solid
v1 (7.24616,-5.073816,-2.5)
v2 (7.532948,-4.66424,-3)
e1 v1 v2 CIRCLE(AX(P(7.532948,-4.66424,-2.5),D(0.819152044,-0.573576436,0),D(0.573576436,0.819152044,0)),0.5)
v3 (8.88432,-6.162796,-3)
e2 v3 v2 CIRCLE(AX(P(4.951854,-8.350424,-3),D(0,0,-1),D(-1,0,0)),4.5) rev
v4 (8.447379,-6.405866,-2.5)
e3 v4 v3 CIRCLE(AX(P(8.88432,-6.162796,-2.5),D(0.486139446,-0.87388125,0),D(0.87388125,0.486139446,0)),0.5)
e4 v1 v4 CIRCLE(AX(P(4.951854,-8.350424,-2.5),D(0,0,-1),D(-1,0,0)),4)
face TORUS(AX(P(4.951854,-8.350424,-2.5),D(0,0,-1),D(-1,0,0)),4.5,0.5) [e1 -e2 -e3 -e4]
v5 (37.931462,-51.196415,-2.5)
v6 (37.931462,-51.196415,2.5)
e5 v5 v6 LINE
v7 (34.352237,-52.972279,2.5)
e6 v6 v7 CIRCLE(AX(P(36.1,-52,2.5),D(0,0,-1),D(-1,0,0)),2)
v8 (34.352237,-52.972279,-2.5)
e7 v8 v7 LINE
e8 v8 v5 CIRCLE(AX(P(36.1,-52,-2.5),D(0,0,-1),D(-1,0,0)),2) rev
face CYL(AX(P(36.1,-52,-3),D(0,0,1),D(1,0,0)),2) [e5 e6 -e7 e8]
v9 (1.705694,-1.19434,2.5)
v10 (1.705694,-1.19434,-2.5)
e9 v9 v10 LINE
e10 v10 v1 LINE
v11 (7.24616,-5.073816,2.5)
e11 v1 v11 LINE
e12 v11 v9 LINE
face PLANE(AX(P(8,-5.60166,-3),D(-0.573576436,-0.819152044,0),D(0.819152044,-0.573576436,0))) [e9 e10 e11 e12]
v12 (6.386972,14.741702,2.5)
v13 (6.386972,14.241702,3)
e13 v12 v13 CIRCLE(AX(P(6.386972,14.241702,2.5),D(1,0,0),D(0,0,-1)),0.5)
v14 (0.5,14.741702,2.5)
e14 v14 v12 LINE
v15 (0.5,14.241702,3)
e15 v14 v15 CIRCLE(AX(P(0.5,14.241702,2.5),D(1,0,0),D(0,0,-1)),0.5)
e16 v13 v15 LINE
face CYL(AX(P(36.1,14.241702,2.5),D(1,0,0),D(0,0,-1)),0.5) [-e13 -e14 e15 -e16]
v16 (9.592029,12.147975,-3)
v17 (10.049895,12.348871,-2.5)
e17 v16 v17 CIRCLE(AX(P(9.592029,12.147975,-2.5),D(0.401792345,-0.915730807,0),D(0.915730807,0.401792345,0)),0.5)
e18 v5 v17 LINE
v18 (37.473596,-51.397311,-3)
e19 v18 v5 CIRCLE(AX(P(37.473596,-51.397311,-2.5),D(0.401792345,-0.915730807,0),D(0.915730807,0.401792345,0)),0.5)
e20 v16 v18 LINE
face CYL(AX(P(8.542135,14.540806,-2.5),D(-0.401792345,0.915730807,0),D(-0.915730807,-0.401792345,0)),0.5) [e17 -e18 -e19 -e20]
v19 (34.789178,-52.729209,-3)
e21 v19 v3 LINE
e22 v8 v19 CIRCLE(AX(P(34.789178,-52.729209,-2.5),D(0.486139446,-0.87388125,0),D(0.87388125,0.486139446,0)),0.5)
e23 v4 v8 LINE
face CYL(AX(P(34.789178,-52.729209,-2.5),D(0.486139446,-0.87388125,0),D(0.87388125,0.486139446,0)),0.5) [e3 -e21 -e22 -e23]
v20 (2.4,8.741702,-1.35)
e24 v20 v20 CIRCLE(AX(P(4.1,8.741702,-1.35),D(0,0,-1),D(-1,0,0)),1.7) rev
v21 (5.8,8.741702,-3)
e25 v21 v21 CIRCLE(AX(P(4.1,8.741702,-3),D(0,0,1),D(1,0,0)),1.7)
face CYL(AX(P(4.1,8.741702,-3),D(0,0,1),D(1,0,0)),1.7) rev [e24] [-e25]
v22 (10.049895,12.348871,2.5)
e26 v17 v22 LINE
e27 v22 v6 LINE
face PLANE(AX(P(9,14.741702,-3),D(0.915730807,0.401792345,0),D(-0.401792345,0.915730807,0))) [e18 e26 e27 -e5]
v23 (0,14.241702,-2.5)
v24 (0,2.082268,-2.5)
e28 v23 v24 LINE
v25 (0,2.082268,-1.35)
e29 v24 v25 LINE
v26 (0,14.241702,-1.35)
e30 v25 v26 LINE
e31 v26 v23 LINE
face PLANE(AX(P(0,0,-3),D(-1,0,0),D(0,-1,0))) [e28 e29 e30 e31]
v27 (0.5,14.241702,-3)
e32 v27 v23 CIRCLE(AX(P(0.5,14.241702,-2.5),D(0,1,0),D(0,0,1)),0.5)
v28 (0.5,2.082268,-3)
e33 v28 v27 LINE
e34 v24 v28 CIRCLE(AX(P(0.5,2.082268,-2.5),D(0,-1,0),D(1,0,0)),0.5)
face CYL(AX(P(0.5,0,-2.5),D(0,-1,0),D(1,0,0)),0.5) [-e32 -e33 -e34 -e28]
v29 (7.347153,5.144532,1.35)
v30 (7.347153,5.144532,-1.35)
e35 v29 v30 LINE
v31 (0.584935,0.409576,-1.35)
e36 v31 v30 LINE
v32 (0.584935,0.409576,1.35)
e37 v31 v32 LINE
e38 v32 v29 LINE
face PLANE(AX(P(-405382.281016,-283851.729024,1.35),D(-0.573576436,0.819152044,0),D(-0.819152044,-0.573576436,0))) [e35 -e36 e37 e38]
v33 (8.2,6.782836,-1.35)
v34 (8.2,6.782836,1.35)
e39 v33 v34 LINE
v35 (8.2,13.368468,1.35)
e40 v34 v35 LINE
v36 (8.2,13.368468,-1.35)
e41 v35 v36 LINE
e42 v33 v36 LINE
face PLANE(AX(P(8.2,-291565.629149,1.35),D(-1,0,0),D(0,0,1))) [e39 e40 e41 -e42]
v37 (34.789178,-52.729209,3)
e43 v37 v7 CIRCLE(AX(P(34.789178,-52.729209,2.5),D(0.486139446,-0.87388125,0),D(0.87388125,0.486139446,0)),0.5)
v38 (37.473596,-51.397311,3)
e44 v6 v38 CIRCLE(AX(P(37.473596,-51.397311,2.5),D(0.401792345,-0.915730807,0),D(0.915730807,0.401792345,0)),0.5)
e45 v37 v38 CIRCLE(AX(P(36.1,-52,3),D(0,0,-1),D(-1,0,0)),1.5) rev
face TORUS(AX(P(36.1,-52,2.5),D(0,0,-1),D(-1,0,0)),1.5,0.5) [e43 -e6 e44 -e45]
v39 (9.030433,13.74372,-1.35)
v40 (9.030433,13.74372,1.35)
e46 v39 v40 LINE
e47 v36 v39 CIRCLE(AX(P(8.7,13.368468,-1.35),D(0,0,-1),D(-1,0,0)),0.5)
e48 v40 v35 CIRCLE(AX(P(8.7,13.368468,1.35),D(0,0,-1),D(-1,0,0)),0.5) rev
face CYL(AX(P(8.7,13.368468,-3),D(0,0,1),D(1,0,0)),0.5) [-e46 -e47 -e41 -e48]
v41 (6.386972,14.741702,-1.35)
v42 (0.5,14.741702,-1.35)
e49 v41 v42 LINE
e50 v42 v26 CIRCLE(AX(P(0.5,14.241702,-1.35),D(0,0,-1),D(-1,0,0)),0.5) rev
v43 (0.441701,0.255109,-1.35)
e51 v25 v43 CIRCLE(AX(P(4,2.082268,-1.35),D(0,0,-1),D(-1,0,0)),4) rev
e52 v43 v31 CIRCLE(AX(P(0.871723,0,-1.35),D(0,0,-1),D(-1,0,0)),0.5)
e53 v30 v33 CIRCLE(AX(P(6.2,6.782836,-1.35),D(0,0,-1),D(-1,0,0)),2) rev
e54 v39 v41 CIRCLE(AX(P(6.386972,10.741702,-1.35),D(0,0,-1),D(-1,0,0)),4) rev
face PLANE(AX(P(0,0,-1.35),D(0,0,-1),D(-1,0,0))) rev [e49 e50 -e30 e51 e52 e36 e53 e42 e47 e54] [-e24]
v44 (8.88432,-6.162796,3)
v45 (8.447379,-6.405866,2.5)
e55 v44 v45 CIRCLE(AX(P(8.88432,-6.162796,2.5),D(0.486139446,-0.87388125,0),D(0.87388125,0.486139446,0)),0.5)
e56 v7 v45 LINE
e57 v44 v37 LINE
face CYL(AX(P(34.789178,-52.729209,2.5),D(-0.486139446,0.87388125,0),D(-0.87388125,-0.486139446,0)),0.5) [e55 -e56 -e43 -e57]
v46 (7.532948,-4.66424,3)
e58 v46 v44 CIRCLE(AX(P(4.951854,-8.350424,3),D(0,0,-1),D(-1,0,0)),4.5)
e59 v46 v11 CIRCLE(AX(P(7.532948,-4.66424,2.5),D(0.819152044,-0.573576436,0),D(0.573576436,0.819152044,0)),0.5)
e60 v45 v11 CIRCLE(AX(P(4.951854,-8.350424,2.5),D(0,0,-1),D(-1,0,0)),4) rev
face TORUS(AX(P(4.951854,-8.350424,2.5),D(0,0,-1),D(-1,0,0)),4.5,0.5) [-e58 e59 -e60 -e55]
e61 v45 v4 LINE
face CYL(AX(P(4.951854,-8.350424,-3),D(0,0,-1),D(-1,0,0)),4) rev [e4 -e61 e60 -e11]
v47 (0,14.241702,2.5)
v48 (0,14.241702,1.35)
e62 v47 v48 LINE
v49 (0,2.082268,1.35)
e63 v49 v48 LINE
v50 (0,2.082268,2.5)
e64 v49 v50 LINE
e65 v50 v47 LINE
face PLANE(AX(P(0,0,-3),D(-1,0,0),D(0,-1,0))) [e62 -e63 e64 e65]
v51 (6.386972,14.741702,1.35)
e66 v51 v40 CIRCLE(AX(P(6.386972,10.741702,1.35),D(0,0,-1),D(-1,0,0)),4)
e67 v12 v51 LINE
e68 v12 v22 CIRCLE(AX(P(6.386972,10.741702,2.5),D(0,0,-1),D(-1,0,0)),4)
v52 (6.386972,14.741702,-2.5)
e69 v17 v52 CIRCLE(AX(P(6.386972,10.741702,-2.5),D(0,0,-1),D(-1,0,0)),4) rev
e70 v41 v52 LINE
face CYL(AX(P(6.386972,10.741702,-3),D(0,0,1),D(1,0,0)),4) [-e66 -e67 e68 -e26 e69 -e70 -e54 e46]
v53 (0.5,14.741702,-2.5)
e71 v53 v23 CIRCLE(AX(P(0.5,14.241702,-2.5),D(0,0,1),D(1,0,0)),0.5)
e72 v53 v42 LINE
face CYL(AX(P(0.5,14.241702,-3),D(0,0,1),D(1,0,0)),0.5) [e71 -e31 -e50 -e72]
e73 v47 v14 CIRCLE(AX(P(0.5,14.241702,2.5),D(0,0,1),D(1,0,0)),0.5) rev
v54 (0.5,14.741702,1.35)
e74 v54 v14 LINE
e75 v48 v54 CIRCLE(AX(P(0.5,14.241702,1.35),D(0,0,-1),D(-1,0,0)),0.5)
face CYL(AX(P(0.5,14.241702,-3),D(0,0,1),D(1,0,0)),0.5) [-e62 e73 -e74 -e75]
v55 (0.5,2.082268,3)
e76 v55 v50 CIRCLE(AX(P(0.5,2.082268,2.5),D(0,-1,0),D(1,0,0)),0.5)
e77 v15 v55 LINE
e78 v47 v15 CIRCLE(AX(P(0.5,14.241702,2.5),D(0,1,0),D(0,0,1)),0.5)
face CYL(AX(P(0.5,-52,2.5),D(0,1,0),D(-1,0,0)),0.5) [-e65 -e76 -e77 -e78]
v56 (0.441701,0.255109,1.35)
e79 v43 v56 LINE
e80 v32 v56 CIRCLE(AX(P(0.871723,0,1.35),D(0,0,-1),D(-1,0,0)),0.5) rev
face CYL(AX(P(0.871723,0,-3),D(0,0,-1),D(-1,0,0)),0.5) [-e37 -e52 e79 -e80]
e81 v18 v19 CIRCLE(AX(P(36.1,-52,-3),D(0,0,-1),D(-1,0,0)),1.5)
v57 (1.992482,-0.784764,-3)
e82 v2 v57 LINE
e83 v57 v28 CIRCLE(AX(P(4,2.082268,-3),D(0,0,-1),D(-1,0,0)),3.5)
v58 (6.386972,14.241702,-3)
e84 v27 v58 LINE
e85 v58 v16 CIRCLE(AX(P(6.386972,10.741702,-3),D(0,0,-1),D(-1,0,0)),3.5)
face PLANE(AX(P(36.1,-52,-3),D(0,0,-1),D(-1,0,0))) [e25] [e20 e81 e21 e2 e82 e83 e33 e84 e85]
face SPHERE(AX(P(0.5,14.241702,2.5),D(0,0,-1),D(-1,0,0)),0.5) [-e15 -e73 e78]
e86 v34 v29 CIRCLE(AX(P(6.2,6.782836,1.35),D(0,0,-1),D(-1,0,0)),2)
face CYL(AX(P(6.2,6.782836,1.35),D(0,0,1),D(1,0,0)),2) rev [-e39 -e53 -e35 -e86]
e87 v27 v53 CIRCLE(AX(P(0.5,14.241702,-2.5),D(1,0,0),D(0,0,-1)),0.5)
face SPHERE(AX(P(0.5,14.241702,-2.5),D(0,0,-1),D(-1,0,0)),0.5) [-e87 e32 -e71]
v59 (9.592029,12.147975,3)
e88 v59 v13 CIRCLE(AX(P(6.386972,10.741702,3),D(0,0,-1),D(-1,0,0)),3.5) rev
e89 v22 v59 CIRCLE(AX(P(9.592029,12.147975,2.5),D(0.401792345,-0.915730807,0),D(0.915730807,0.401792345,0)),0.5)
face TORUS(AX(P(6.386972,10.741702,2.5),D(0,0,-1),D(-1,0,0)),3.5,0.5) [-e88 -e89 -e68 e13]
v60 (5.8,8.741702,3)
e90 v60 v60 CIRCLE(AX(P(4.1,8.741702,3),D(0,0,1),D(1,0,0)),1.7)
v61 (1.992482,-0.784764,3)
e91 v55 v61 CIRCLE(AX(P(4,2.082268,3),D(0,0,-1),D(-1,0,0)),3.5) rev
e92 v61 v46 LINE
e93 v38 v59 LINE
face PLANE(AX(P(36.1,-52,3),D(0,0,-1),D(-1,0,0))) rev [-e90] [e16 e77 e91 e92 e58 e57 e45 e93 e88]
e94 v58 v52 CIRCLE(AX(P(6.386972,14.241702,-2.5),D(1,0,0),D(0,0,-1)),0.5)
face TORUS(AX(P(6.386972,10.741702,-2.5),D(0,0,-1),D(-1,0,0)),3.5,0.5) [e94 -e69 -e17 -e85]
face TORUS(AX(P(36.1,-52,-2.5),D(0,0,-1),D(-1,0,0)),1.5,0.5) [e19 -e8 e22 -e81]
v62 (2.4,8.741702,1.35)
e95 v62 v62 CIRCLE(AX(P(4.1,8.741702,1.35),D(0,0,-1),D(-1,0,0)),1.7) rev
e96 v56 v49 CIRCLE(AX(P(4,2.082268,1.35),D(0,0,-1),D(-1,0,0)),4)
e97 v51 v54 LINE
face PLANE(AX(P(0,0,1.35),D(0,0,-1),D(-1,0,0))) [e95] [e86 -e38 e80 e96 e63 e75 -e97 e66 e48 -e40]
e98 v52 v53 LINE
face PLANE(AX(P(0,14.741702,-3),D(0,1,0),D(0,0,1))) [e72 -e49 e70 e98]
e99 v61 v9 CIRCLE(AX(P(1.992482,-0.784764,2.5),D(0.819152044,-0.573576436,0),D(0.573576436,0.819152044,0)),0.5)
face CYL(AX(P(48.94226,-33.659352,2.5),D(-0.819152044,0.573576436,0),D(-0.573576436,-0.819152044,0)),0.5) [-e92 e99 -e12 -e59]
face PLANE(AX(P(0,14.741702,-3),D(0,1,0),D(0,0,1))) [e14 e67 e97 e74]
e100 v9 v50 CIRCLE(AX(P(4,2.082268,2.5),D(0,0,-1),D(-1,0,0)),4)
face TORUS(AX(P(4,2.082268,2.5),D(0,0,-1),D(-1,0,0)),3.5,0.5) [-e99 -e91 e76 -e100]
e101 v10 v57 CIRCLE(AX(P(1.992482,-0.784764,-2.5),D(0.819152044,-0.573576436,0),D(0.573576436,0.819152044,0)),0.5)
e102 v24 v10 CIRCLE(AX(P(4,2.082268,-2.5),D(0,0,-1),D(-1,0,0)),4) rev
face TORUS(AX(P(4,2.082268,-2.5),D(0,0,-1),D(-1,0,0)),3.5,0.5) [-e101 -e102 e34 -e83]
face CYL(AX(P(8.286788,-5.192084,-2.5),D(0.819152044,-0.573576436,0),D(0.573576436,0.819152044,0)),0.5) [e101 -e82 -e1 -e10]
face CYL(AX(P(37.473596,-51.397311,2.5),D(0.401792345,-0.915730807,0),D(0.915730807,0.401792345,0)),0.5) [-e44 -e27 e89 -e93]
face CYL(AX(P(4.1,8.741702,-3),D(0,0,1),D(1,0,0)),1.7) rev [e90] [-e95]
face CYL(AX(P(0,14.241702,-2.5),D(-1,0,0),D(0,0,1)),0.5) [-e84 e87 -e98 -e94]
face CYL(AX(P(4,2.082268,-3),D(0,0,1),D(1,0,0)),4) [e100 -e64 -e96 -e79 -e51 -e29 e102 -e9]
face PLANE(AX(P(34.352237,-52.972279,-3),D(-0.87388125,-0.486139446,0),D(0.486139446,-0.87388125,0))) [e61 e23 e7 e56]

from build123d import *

# Parameters (mm, degrees)
BOSS_EXTRUDE1_DEPTH      = 3
BOSS_EXTRUDE1_DEPTH_BACK = 3
SKETCH1_R                = 1.7
CUT_EXTRUDE1_DEPTH       = 1.35
CUT_EXTRUDE1_DEPTH_BACK  = 1.35
CUT_EXTRUDE1_START       = -3
FILLET1_R                = 2
FILLET2_R                = 0.5
FILLET3_R                = 4
FILLET4_R                = 4
FILLET5_R                = 4
FILLET6_R                = 0.5
FILLET7_R                = 0.5


with BuildPart() as part:
    # Sketch1 → Boss-Extrude1 (new, two sides: drawn at the far end of the back side and taken through both)
    with BuildSketch(Plane.XY.offset(-BOSS_EXTRUDE1_DEPTH_BACK)):
        with BuildLine():
            Line((0, 0), (0, 14.741701813))
            Line((0, 14.741701813), (9, 14.741701813))
            Line((9, 14.741701813), (37.931461615, -51.19641531))
            ThreePointArc((37.931461615, -51.19641531), (36.98891746, -53.791598658), (34.3522375, -52.972278891))
            Line((34.3522375, -52.972278891), (8, -5.601660306))
            Line((8, -5.601660306), (0, 0))
        make_face()
        with Locations((4.1, 8.741701813)):
            Circle(SKETCH1_R, mode=Mode.SUBTRACT)
    extrude(amount=BOSS_EXTRUDE1_DEPTH + BOSS_EXTRUDE1_DEPTH_BACK)

    # Sketch2 → Cut-Extrude1 (cut, two sides: drawn at the far end of the back side and taken through both)
    with BuildSketch(Plane.XY.offset(3).offset(CUT_EXTRUDE1_START - CUT_EXTRUDE1_DEPTH_BACK)):
        Polygon((0, 0), (0, 14.741701813), (8.2, 14.741701813), (8.2, 5.741701813), align=None)
    extrude(amount=CUT_EXTRUDE1_DEPTH + CUT_EXTRUDE1_DEPTH_BACK, mode=Mode.SUBTRACT)

    # Fillet1
    fillet1_edges = [part.edges().sort_by_distance(p)[0] for p in [
        (8.2, 5.741701813, 0),
    ]]
    fillet(fillet1_edges, radius=FILLET1_R)

    # Fillet2
    fillet2_edges = [part.edges().sort_by_distance(p)[0] for p in [
        (0, 0, 0),
    ]]
    fillet(fillet2_edges, radius=FILLET2_R)

    # Fillet3
    fillet3_edges = [part.edges().sort_by_distance(p)[0] for p in [
        (8, -5.601660306, 0),
    ]]
    fillet(fillet3_edges, radius=FILLET3_R)

    # Fillet4
    # the kernel refuses this fillet: 4 mm, written as the material it takes off along each edge
    with BuildSketch(Plane(origin=(9, 14.741701813, 9.532571038), x_dir=(0.4017923449729062, -0.9157308073452443, 0), z_dir=(0, 0, -1))) as fillet4_piece_1:
        with BuildLine():
            CenterArc((FILLET4_R * 0.653257103757, FILLET4_R), FILLET4_R, 203.690274531, 66.309725469)
            Line((-FILLET4_R * 0.262473703589, FILLET4_R * 0.598207655027), (0, 0))
            Line((0, 0), (FILLET4_R * 0.653257103757, 0))
        make_face()
    extrude(amount=19.065142075, mode=Mode.SUBTRACT)

    # Fillet5
    fillet5_edges = [part.edges().sort_by_distance(p)[0] for p in [
        (0, 0, 2.175),
    ]]
    fillet(fillet5_edges, radius=FILLET5_R)

    # Fillet6
    fillet6_edges = [part.edges().sort_by_distance(p)[0] for p in [
        (0, 14.741701813, -2.175),
        (0, 14.741701813, 2.175),
        (8.2, 14.307221126, 0),
    ]]
    fillet(fillet6_edges, radius=FILLET6_R)

    # Fillet7
    fillet7_edges = [part.edges().sort_by_distance(p)[0] for p in [
        (4.475927023, -3.134077842, 3),
        (0.451956667, 0.235273749, 3),
        (4.475927023, -3.134077842, -3),
        (0.451956667, 0.235273749, -3),
        (0, 8.161985008, -3),
        (0.146446609, 14.595255204, -3),
        (0, 8.161985008, 3),
        (0.146446609, 14.595255204, 3),
        (36.98891746, -53.791598658, -3),
        (23.990678215, -19.423772058, -3),
        (36.98891746, -53.791598658, 3),
        (23.990678215, -19.423772058, 3),
        (21.399808273, -29.689072498, 3),
        (21.399808273, -29.689072498, -3),
        (7.922396855, -5.671641436, 3),
        (7.922396855, -5.671641436, -3),
        (3.443485792, 14.741701813, 3),
        (8.574587008, 14.090483496, 3),
        (3.443485792, 14.741701813, -3),
        (8.574587008, 14.090483496, -3),
    ]]
    fillet(fillet7_edges, radius=FILLET7_R)


solid = part.part
